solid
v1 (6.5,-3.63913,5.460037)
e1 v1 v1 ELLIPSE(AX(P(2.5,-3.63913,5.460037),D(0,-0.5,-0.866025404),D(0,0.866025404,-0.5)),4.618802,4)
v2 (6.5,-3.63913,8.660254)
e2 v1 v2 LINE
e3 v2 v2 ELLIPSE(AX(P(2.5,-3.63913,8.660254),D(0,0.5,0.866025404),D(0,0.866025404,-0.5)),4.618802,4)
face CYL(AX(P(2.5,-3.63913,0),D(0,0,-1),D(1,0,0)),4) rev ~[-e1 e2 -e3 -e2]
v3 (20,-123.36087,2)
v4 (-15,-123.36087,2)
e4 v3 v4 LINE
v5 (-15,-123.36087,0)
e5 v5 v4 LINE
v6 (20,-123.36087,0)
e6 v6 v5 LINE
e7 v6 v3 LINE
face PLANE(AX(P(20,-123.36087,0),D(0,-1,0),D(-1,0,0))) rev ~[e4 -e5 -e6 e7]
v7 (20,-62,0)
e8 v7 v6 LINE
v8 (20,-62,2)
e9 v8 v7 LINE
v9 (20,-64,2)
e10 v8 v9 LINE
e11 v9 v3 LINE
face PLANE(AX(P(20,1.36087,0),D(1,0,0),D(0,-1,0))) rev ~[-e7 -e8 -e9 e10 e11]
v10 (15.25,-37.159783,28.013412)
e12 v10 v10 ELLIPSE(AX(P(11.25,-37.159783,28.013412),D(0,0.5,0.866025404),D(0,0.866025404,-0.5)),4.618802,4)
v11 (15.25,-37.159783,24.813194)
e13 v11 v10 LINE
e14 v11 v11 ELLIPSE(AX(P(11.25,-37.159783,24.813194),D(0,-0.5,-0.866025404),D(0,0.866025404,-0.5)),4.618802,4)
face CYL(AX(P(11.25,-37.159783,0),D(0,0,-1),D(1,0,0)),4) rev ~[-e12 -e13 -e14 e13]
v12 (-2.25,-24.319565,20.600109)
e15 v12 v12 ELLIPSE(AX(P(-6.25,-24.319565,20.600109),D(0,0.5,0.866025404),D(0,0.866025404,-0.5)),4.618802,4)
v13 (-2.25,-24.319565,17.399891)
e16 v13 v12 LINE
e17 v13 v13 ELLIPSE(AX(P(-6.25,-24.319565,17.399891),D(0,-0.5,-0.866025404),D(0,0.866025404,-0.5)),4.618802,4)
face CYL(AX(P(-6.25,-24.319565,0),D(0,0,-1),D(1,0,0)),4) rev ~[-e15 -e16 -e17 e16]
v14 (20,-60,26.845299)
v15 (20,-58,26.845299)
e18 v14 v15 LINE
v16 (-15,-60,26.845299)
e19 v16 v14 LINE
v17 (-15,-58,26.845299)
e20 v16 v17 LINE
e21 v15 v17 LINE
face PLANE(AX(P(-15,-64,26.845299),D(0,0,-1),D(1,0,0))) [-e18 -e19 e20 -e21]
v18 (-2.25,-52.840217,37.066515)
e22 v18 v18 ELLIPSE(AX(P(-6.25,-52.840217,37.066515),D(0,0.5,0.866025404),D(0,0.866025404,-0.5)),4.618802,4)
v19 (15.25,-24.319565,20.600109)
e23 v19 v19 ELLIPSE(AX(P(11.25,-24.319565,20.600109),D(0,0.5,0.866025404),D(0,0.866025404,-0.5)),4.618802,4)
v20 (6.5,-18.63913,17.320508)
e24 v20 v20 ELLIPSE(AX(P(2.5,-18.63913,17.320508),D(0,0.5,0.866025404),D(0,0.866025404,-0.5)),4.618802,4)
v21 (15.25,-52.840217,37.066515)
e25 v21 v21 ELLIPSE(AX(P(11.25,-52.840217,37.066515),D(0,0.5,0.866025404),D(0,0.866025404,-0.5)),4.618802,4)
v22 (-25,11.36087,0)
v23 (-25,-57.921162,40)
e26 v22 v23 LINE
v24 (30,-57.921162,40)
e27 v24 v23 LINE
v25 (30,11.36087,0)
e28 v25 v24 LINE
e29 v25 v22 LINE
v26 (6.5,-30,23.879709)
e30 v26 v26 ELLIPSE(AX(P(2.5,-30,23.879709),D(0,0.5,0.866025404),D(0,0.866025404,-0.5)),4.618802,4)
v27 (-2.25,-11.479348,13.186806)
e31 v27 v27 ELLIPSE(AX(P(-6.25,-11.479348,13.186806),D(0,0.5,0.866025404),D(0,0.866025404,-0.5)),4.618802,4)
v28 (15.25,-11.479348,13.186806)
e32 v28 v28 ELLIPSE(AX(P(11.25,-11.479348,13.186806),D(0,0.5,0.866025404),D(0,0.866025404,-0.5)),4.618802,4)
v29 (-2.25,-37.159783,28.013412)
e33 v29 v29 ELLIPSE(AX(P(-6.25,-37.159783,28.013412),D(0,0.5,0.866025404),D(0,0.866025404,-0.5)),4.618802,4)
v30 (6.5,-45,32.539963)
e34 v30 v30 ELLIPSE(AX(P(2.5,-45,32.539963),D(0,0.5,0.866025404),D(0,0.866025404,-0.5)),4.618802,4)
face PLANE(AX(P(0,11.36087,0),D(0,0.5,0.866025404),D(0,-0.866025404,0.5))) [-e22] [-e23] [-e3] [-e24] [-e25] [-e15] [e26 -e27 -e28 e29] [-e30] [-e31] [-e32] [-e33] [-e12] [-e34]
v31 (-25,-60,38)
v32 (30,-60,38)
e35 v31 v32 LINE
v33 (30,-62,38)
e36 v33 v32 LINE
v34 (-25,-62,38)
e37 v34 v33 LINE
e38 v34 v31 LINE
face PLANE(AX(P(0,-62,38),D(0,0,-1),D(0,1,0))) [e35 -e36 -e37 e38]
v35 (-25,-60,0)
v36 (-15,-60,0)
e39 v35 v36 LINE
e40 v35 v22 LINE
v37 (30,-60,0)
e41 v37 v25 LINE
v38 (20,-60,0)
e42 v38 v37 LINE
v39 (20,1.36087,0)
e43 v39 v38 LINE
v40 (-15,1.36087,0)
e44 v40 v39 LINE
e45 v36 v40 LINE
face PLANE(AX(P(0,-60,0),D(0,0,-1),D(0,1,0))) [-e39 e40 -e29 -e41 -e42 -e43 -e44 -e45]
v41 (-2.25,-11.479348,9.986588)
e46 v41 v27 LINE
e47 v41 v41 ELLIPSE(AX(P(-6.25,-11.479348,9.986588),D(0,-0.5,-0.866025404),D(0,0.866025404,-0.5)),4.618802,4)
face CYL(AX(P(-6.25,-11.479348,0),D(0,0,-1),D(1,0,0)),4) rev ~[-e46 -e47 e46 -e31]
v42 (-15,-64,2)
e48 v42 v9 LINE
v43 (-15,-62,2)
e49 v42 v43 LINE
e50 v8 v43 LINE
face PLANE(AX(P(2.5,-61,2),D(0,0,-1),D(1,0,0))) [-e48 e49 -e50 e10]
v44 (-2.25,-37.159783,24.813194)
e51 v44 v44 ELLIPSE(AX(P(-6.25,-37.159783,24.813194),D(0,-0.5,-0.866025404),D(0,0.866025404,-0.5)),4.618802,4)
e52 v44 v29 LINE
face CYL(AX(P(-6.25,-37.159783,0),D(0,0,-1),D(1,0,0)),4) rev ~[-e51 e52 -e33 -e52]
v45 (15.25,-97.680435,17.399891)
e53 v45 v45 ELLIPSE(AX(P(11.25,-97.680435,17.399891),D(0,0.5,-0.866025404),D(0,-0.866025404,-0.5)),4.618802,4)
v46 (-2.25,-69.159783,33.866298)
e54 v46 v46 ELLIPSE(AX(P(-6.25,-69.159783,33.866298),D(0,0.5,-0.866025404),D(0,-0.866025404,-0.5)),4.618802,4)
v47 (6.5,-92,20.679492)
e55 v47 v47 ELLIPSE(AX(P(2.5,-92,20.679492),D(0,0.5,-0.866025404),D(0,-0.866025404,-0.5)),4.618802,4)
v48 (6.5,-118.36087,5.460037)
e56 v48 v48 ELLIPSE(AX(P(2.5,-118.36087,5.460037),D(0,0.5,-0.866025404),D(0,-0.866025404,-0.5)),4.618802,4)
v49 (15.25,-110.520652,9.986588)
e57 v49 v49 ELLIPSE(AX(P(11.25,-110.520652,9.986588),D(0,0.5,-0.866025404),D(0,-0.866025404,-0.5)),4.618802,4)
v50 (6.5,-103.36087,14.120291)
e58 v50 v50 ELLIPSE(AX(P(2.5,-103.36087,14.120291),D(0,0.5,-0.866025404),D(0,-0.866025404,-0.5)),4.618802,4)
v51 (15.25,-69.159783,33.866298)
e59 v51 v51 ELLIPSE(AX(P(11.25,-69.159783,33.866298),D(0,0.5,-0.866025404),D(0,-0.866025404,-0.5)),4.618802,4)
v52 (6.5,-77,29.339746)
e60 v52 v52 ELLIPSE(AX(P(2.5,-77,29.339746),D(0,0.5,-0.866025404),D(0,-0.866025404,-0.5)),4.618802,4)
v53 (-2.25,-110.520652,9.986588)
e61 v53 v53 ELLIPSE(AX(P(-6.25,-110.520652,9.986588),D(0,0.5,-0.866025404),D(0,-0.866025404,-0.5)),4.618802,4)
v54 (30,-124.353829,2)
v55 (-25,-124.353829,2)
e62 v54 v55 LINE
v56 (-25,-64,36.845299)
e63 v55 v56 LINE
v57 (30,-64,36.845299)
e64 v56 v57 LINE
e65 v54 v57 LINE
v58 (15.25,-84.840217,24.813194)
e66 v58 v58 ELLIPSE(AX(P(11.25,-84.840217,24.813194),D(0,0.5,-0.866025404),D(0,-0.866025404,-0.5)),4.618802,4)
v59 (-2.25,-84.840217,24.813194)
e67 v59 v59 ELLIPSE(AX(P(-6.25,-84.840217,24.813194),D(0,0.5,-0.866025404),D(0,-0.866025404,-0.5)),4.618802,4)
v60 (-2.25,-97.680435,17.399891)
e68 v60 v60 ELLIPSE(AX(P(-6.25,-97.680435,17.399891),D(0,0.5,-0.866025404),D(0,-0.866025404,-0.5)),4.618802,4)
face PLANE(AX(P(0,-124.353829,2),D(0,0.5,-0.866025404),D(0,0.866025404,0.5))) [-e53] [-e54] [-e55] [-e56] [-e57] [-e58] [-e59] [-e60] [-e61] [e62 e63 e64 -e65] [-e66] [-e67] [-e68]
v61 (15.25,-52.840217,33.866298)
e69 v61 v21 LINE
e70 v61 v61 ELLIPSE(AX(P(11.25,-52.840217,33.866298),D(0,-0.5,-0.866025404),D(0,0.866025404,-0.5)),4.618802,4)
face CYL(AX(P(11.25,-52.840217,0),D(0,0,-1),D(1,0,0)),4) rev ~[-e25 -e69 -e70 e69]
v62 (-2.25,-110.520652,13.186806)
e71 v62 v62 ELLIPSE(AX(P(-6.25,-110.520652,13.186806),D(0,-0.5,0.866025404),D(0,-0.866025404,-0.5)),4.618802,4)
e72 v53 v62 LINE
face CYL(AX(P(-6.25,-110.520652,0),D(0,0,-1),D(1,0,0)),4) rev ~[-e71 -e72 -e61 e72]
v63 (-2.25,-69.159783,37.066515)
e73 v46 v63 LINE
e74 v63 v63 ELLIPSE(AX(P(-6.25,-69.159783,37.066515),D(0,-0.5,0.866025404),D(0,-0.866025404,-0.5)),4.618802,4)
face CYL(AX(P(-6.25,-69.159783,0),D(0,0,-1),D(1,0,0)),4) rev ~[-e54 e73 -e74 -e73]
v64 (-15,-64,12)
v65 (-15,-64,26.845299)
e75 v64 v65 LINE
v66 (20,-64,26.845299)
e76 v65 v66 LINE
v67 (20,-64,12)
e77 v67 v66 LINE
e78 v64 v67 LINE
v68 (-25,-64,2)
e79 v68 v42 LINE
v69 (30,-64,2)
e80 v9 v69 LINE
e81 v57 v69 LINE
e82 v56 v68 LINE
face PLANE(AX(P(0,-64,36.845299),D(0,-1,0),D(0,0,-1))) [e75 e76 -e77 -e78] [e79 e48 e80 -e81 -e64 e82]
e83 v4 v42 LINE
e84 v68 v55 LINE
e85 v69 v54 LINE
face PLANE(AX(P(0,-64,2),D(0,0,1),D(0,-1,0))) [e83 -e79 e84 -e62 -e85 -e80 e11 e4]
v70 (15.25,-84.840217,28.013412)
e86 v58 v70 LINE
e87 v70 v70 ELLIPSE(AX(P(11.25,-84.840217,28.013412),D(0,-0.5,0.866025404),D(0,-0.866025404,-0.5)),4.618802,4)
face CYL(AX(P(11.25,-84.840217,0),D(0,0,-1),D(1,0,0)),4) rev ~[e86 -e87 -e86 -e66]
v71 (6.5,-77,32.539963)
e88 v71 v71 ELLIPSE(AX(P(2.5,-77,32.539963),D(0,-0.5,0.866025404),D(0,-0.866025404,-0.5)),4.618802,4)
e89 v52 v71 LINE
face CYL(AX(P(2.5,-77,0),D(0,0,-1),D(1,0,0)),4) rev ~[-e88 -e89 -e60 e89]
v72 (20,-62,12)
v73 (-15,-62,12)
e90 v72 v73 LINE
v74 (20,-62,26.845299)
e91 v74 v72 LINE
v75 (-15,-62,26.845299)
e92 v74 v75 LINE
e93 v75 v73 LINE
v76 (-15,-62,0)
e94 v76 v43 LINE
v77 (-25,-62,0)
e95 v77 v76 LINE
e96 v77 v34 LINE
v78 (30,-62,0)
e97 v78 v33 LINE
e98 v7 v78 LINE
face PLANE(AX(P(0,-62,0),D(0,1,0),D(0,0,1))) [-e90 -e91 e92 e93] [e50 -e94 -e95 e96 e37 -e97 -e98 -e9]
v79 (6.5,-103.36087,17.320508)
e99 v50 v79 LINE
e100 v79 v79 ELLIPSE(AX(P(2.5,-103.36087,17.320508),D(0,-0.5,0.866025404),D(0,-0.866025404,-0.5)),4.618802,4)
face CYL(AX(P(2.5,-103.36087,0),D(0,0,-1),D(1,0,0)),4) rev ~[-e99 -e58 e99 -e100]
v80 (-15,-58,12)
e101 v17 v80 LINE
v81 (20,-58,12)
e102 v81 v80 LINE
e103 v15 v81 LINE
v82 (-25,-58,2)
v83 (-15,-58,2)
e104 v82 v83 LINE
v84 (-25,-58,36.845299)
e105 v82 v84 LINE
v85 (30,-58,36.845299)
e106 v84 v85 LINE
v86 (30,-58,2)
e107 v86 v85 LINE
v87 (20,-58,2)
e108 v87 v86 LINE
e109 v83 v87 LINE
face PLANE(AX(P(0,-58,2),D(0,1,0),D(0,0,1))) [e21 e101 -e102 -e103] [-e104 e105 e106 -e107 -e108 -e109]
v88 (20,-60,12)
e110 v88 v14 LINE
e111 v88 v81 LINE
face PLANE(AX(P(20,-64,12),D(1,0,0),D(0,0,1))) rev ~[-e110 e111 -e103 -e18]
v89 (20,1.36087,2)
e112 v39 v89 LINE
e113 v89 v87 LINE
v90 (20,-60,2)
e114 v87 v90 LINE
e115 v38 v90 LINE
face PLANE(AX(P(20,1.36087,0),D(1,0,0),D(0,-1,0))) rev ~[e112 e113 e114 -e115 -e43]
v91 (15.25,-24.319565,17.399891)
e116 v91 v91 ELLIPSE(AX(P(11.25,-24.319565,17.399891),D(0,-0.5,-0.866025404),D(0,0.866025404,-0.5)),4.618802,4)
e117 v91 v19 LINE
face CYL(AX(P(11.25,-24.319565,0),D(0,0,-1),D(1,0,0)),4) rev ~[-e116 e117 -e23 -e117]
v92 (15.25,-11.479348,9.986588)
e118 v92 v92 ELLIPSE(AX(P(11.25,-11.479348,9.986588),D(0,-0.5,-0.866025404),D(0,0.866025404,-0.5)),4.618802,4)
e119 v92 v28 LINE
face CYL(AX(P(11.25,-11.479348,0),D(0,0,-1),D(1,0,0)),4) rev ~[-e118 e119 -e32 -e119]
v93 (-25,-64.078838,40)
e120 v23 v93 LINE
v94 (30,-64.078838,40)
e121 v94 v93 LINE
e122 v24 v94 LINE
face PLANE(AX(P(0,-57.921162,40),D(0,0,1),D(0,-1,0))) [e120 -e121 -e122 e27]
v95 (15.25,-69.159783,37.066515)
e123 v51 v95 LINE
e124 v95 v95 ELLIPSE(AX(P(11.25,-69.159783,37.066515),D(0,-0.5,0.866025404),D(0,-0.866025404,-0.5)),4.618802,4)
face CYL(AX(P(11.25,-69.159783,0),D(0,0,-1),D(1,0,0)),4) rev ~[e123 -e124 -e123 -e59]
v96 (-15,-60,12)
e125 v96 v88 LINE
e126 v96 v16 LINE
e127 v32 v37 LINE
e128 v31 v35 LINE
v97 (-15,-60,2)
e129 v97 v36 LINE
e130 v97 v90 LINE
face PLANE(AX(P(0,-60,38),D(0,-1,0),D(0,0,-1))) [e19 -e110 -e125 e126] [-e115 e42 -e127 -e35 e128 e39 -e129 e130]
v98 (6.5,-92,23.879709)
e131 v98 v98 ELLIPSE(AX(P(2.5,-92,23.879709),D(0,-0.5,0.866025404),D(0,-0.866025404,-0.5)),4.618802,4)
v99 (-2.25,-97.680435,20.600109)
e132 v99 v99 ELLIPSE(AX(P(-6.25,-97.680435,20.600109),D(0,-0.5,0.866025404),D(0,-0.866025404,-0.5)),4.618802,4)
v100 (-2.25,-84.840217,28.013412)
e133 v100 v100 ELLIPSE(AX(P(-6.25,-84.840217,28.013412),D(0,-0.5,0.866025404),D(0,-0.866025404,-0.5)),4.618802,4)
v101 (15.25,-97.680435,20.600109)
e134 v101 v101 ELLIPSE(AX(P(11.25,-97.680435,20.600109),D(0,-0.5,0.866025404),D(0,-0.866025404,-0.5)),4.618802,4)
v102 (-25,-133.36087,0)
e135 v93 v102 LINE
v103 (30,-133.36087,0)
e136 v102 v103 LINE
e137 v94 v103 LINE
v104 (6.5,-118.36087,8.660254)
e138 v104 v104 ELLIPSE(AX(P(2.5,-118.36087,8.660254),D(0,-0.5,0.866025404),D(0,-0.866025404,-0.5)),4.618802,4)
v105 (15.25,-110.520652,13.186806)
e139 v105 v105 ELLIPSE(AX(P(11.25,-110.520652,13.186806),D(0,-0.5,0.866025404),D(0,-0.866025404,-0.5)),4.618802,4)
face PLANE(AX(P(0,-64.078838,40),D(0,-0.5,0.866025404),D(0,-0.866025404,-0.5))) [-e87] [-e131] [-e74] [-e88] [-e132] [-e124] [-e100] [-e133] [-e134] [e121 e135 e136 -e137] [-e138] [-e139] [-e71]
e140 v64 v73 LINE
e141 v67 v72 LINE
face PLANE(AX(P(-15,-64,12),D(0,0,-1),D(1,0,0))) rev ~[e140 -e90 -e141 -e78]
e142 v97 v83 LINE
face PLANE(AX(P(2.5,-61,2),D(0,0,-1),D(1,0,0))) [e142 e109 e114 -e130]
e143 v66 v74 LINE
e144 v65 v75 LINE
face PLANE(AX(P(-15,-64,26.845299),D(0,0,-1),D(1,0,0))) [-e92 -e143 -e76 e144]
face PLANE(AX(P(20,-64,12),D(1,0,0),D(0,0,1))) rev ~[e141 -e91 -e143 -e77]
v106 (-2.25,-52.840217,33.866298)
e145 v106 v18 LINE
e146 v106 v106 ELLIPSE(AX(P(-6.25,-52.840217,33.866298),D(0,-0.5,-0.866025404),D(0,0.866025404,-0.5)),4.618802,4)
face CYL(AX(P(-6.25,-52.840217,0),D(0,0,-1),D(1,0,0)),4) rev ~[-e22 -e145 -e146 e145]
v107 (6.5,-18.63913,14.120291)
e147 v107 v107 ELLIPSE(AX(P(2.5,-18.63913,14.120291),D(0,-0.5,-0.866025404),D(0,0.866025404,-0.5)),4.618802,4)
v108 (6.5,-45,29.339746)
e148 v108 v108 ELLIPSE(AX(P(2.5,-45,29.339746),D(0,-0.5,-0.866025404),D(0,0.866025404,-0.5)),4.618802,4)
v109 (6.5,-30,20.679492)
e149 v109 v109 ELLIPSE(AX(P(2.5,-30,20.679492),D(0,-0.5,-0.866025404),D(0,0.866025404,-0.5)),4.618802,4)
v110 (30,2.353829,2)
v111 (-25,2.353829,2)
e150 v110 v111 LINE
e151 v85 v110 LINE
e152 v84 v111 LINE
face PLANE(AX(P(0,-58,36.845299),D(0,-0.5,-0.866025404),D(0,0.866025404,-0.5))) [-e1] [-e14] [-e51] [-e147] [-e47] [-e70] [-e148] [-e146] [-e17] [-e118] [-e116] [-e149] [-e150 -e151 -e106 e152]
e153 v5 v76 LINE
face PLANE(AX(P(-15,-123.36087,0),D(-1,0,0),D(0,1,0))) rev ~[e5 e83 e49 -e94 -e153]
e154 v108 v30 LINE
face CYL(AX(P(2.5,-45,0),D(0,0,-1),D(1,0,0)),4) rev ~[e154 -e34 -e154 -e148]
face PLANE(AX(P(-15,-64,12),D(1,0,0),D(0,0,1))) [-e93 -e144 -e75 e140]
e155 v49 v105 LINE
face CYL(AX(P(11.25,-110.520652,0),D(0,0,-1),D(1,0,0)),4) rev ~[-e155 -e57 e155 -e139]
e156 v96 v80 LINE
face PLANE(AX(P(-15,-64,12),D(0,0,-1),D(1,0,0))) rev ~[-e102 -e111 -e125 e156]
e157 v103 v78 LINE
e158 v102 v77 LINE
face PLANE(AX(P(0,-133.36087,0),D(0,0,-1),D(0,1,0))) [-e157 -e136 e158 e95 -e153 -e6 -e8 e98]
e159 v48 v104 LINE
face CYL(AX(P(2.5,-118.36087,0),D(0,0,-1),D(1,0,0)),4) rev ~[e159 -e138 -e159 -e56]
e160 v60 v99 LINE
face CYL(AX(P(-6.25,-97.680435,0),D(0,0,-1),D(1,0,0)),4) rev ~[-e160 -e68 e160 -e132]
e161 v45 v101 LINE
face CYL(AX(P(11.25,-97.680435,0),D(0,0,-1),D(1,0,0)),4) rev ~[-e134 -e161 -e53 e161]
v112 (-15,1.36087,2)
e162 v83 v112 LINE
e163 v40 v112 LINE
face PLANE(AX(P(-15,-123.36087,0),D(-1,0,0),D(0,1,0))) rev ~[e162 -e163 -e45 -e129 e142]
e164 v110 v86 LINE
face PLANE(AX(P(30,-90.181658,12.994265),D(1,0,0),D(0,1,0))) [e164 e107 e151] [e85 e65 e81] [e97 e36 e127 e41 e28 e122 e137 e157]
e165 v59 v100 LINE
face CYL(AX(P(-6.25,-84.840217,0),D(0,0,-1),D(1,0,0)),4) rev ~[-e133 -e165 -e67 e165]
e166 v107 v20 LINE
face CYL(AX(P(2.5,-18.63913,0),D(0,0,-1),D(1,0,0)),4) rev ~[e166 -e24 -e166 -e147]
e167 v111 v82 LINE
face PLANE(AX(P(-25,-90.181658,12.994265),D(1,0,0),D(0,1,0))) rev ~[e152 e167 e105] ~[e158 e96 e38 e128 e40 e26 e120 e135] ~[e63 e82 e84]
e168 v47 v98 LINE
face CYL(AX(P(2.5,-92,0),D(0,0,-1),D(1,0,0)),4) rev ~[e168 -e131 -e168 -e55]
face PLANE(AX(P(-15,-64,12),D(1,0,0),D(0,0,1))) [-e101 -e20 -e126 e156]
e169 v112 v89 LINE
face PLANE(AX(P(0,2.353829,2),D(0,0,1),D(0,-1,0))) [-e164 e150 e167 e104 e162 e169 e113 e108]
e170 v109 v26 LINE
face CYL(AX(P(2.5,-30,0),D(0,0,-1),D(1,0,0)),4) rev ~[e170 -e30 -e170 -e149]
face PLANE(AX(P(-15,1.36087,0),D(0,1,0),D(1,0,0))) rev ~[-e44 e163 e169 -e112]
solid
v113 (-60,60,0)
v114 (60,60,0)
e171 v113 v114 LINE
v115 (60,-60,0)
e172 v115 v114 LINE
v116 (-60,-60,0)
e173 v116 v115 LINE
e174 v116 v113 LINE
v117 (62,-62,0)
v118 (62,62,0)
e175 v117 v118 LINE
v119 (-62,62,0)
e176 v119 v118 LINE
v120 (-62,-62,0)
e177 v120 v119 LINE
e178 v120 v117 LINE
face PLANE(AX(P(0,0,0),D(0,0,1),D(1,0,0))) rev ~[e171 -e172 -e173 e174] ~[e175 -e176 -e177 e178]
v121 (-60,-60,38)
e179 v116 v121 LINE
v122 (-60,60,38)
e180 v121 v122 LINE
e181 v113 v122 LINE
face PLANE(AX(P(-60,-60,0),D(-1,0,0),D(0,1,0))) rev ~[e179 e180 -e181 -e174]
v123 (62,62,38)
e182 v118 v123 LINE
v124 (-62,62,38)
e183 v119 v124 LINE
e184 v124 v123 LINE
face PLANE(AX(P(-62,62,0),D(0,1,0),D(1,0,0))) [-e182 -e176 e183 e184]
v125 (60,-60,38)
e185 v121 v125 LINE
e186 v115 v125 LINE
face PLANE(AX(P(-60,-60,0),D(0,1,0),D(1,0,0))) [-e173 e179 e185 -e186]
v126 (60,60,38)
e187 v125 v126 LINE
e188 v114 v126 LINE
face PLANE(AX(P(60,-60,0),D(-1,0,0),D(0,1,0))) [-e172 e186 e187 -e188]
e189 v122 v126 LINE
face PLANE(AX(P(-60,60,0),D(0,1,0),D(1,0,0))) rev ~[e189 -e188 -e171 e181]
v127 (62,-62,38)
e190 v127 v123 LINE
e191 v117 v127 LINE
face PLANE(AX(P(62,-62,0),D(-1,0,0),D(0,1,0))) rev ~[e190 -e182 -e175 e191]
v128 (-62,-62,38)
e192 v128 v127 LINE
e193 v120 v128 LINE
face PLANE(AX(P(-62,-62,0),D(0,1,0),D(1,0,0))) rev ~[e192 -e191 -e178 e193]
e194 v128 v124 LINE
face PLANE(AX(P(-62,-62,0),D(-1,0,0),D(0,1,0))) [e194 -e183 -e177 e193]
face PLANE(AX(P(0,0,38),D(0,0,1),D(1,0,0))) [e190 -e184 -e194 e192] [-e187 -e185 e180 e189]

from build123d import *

# Parameters (mm, degrees)
F0_W          = 124
F0_H          = 124
F0_W_2        = 120
F0_H_2        = 120
F1_DEPTH      = 38
F2_W          = 2
F2_H          = 2
F3_DEPTH      = 30
F3_DEPTH_BACK = 25
F5_DEPTH      = 2
F6_R          = 4
F7_DEPTH      = 70
F8_W          = 35
F8_H          = 14.8452994616
F9_DEPTH      = 10


with BuildPart() as f1:
    # F0 (on Top) → F1 (new body)
    with BuildSketch(Plane.XY):
        Rectangle(F0_W, F0_H)
        Rectangle(F0_W_2, F0_H_2, mode=Mode.SUBTRACT)
    extrude(amount=F1_DEPTH)


with BuildPart() as f3:
    # F2 (on Right) → F3 (new body, two sides)
    with BuildSketch(Plane.YZ) as f3_sk:
        Polygon((-127.8179306876, 0), (-62, 0), (-62, 38), (-64, 36.8452994616), (-64, 38), (-64.0788376331, 38), (-64.0788376331, 40), (-133.3608699359, 0), align=None)
        Polygon((-124.3538290725, 2), (-64, 36.8452994616), (-64, 2), (-120.3538290725, 2), align=None, mode=Mode.SUBTRACT)
        Polygon((-64, 36.8452994616), (-62, 38), (-64, 38), align=None)
        Polygon((-64, 38), (-62, 38), (-62, 40), (-64.0788376331, 40), (-64.0788376331, 38), align=None)
        with Locations((-61, 39)):
            Rectangle(F2_W, F2_H)
        Polygon((-60, 40), (-60, 38), (-58, 36.8452994616), (-58, 38), (-57.9211623669, 40), align=None)
        Polygon((-58, 36.8452994616), (-60, 38), (-60, 0), (5.8179306876, 0), (11.3608699359, 0), (-57.9211623669, 40), (-58, 38), align=None)
        Polygon((-58, 2), (-58, 36.8452994616), (2.3538290725, 2), (-1.6461709275, 2), align=None, mode=Mode.SUBTRACT)
    extrude(amount=F3_DEPTH)
    extrude(f3_sk.sketch, amount=-F3_DEPTH_BACK)

    # F4 (on face) → F5 (cut)
    with BuildSketch(Plane(origin=(0, 0, 0), x_dir=(1, 0, 0), z_dir=(0, 0, -1))):
        Polygon((20, 123.3608699359), (-15, 123.3608699359), (-15, 72), (-15, 50), (-15, -1.3608699359), (-10.7783097774, -1.3608699359), (15.7783097774, -1.3608699359), (20, -1.3608699359), (20, 50), (20, 72), align=None)
    extrude(amount=-F5_DEPTH, mode=Mode.SUBTRACT)

    # F6 (on face) → F7 (cut)
    with BuildSketch(Plane(origin=(0, 0, 0), x_dir=(1, 0, 0), z_dir=(0, 0, -1))):
        with Locations((2.5, 118.3608699359)):
            Circle(F6_R)
        with Locations((2.5, 103.3608699359)):
            Circle(F6_R)
        with Locations((-6.25, 110.5206524519)):
            Circle(F6_R)
        with Locations((11.25, 110.5206524519)):
            Circle(F6_R)
        with Locations((2.5, 92)):
            Circle(F6_R)
        with Locations((11.25, 84.840217484)):
            Circle(F6_R)
        with Locations((2.5, 77)):
            Circle(F6_R)
        with Locations((-6.25, 84.840217484)):
            Circle(F6_R)
        with Locations((11.25, 69.159782516)):
            Circle(F6_R)
        with Locations((-6.25, 69.159782516)):
            Circle(F6_R)
        with Locations((11.25, 52.840217484)):
            Circle(F6_R)
        with Locations((2.5, 45)):
            Circle(F6_R)
        with Locations((-6.25, 52.840217484)):
            Circle(F6_R)
        with Locations((11.25, 37.159782516)):
            Circle(F6_R)
        with Locations((-6.25, 37.159782516)):
            Circle(F6_R)
        with Locations((2.5, 30)):
            Circle(F6_R)
        with Locations((2.5, 18.6391300641)):
            Circle(F6_R)
        with Locations((11.25, 11.4793475481)):
            Circle(F6_R)
        with Locations((2.5, 3.6391300641)):
            Circle(F6_R)
        with Locations((-6.25, 11.4793475481)):
            Circle(F6_R)
        with Locations((-6.25, 97.6804349679)):
            Circle(F6_R)
        with Locations((11.25, 97.6804349679)):
            Circle(F6_R)
        with Locations((-6.25, 24.3195650321)):
            Circle(F6_R)
        with Locations((11.25, 24.3195650321)):
            Circle(F6_R)
    extrude(amount=-F7_DEPTH, mode=Mode.SUBTRACT)

    # F8 (on face) → F9 (cut)
    with BuildSketch(Plane.XZ.offset(64)):
        with Locations((2.5, 19.4226497308)):
            Rectangle(F8_W, F8_H)
    extrude(amount=-F9_DEPTH, mode=Mode.SUBTRACT)


solid = Compound([f1.part, f3.part])
